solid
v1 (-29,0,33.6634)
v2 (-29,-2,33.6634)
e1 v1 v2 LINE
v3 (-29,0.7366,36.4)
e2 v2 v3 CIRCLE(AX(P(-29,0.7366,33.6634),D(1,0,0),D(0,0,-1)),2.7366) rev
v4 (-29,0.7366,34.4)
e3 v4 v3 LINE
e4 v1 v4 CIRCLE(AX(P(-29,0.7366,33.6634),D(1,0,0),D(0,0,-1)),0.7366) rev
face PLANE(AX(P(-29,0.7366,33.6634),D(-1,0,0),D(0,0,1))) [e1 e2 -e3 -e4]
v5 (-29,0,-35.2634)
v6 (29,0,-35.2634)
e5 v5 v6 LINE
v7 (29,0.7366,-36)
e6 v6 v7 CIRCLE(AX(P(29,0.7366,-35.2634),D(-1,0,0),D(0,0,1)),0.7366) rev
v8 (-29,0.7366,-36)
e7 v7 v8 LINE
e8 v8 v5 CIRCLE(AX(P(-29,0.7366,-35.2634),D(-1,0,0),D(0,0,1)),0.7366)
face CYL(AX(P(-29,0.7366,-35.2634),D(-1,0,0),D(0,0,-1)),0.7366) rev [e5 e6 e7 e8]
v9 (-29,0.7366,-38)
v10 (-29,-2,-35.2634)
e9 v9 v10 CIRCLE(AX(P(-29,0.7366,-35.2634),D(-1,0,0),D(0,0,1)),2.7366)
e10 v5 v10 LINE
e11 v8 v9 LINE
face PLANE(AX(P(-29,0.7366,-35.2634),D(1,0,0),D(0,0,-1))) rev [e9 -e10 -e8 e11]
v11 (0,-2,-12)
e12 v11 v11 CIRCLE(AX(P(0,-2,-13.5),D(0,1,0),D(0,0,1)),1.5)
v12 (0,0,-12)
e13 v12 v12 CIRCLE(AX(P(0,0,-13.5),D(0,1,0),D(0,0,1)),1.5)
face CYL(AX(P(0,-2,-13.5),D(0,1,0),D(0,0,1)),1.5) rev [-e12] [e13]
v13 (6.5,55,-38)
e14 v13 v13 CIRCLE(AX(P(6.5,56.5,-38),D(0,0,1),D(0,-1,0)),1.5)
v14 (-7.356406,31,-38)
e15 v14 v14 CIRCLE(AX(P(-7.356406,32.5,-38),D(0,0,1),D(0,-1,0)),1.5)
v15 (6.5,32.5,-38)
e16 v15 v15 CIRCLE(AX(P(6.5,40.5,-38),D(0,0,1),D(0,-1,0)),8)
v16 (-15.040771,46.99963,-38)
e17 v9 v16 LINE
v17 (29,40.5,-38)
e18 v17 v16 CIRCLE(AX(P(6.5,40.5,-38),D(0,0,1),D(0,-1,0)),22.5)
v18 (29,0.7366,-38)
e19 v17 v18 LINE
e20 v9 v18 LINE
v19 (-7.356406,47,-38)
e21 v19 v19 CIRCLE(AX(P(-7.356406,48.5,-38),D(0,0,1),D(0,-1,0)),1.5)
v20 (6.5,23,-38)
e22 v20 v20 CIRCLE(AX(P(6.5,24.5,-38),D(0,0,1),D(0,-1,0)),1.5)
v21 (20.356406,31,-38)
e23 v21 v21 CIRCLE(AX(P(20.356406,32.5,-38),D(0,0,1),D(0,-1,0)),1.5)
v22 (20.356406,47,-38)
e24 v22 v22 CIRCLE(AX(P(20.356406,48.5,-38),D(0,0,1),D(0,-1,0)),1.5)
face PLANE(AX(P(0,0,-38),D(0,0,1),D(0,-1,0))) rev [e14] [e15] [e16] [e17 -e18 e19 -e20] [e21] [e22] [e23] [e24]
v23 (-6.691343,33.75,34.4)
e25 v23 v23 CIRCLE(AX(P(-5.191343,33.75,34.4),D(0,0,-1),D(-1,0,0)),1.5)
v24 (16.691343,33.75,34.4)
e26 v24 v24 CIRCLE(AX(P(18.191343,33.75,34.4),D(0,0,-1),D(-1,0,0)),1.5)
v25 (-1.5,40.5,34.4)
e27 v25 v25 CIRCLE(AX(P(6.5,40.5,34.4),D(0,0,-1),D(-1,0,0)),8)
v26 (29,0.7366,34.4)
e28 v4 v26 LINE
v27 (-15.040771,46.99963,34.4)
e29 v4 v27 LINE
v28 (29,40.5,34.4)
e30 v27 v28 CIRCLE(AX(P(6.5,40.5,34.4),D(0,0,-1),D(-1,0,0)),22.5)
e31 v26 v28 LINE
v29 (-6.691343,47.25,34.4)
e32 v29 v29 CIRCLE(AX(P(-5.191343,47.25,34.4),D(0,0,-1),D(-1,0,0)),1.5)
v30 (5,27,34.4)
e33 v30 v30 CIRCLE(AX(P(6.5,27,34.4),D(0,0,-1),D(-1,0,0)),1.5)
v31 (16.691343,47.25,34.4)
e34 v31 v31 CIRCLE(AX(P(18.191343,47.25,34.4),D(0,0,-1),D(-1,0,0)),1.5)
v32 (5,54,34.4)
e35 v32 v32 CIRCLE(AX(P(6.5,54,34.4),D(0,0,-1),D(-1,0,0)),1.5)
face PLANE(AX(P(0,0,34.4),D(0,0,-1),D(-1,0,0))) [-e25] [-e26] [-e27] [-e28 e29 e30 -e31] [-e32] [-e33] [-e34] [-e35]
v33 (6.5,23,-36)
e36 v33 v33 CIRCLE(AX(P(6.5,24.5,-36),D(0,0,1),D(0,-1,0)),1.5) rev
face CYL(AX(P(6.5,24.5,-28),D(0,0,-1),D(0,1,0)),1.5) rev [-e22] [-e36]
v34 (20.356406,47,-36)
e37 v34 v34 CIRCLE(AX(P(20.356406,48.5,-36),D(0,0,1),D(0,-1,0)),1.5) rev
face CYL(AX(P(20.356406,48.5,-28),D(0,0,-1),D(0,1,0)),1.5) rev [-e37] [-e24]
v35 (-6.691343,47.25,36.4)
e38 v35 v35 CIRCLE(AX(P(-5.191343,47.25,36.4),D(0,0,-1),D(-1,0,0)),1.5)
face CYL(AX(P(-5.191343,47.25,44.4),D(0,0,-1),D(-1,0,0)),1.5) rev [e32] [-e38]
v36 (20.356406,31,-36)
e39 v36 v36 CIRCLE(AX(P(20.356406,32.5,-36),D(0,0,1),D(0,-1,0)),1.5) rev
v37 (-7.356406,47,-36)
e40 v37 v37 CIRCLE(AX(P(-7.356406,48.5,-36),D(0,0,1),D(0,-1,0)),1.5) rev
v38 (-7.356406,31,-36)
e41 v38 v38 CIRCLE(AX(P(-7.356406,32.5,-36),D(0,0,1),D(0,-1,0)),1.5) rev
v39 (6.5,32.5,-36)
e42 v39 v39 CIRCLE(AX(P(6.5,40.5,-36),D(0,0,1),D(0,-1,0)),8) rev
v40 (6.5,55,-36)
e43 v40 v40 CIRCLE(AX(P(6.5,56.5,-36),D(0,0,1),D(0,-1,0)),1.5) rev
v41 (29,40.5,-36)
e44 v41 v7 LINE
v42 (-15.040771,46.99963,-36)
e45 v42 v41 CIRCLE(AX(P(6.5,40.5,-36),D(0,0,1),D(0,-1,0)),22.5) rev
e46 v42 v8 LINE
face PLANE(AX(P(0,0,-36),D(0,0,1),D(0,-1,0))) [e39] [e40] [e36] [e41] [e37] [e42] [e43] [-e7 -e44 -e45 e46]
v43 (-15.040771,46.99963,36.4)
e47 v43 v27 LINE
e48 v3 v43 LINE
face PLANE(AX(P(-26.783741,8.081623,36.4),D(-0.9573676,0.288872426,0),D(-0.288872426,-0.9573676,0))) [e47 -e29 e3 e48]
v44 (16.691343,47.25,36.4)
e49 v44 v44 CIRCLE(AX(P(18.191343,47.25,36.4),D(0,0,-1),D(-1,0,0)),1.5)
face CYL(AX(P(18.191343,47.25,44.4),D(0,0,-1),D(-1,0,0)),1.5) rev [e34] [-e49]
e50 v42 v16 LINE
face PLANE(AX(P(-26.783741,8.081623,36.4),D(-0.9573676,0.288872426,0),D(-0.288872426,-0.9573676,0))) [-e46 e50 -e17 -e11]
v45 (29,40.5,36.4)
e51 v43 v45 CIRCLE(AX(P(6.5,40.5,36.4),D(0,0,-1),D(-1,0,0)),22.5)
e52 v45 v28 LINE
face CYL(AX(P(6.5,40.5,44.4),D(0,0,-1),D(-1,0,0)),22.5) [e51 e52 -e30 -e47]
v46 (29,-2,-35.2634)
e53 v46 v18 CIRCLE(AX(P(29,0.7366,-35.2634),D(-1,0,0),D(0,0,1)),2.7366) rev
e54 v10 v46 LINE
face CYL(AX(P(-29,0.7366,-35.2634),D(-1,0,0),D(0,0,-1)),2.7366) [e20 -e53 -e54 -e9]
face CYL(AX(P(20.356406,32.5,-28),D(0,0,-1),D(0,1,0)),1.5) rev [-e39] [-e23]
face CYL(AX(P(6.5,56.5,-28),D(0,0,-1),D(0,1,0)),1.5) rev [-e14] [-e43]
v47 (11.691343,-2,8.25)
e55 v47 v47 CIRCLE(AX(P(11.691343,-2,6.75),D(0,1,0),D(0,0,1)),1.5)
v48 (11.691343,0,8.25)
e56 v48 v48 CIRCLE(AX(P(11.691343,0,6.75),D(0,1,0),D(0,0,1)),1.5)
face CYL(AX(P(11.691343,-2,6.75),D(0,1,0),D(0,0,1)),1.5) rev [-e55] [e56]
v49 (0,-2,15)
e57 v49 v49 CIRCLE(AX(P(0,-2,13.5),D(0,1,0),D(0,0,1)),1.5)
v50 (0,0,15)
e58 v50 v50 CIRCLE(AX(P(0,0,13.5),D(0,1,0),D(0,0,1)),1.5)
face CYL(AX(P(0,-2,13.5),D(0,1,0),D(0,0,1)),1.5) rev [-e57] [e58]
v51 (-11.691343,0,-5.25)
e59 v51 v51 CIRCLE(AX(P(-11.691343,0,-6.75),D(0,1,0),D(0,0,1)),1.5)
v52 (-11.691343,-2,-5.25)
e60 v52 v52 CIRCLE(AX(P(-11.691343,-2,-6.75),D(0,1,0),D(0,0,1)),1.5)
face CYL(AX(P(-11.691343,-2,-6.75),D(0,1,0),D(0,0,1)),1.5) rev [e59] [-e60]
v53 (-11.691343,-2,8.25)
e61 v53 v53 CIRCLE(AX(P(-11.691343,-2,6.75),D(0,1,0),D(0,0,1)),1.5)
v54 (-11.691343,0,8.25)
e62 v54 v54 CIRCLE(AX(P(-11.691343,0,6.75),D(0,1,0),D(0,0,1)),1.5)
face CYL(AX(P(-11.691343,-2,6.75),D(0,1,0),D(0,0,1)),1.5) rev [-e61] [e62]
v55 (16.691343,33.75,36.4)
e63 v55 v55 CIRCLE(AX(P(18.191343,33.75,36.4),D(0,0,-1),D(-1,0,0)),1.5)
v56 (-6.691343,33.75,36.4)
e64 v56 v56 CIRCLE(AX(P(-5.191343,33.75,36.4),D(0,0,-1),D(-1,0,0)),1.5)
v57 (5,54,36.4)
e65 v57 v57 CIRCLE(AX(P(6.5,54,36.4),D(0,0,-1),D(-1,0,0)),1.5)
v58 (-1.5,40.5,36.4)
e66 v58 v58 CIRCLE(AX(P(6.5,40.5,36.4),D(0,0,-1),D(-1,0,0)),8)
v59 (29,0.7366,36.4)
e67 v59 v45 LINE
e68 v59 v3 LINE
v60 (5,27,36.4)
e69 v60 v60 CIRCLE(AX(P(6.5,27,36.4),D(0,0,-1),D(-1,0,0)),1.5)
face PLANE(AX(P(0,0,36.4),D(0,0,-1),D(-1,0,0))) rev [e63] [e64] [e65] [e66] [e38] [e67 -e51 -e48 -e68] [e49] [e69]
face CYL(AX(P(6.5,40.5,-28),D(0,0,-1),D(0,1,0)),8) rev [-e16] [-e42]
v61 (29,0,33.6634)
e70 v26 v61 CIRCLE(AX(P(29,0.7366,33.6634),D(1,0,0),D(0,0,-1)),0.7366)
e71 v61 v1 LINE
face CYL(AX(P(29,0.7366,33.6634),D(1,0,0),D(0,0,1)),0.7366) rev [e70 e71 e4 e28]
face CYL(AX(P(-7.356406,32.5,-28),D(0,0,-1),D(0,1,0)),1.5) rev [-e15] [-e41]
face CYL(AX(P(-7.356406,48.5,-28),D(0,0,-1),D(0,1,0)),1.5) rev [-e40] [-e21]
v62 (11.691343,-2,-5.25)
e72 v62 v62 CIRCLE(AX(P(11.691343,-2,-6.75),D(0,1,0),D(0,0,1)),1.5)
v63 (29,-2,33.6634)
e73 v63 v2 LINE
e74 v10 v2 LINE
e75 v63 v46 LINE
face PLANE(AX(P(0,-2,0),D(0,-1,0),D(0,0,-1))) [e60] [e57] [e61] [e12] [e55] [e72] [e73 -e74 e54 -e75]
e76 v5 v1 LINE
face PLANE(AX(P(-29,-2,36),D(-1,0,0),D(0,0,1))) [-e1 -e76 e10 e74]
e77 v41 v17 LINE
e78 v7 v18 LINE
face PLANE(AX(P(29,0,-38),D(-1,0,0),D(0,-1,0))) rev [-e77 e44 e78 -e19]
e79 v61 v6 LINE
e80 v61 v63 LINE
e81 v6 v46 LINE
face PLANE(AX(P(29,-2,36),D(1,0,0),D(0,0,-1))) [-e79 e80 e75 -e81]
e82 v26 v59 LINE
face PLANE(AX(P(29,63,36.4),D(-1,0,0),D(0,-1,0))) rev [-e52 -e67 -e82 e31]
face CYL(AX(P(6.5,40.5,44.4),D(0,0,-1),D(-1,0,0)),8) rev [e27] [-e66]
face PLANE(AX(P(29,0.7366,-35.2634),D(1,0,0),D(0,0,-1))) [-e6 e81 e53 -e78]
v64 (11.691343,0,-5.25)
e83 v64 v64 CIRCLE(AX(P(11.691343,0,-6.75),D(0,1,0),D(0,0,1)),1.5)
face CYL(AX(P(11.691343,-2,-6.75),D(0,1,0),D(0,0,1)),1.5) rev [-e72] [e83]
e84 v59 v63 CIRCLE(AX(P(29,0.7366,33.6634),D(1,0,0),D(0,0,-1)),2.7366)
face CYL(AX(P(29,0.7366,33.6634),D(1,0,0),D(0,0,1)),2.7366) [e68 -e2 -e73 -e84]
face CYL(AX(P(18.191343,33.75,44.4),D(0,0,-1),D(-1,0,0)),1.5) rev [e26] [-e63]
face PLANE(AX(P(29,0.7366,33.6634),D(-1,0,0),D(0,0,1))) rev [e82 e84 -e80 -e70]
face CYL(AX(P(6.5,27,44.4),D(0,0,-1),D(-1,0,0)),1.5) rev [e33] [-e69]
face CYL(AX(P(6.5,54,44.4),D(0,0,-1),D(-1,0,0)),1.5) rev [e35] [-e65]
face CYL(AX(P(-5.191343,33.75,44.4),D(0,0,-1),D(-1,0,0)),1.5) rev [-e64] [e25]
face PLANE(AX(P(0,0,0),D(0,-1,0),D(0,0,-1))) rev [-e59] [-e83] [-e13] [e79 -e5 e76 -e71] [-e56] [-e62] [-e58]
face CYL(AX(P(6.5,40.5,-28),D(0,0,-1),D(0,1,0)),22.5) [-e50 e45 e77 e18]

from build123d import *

# Parameters (mm, degrees)
SKETCH_1_R                         = 1.5
SM_BASE_FLANGE_1_DEPTH             = 2
SM_EDGE_FLANGE_1_STRIP_W           = 9.4732
SM_EDGE_FLANGE_1_STRIP_H           = 2
SM_EDGE_FLANGE_1_STRIP_CUT_DEPTH   = 58
SM_EDGE_FLANGE_1_STRIP_2_W         = 9.4732
SM_EDGE_FLANGE_1_STRIP_2_H         = 2
SM_EDGE_FLANGE_1_STRIP_CUT_2_DEPTH = 58
SM_EDGE_FLANGE_1_DEPTH             = 58
SM_EDGE_FLANGE_1_BEND_DEPTH        = 58
SKETCH_12_R                        = 1.5
SKETCH_12_R_2                      = 8
CUT_EXTRUDE_1_DEPTH                = 10
SKETCH_21_R                        = 1.5
SKETCH_21_R_2                      = 8
CUT_EXTRUDE_2_DEPTH                = 10
CUT_EXTRUDE_3_DEPTH                = 102.712142835


# Sheet-metal steps are written as plain solids
with BuildPart() as part:
    # Sketch 1 → 基体-法兰1 (new body)
    with BuildSketch(Plane(origin=(0, 0, 0), x_dir=(1, 0, 0), z_dir=(0, 1, 0))):
        Polygon((-29, -36), (-29, 36), (-29, 38), (29, 38), (29, 36), (29, -36), (29, -36.4), (-29, -36.4), align=None)
        with Locations(Location((0, 13.5, 0), (0, 0, 270))):
            Circle(SKETCH_1_R, mode=Mode.SUBTRACT)
        with Locations(Location((11.691342951, 6.75, 0), (0, 0, 270))):
            Circle(SKETCH_1_R, mode=Mode.SUBTRACT)
        with Locations(Location((11.691342951, -6.75, 0), (0, 0, 270))):
            Circle(SKETCH_1_R, mode=Mode.SUBTRACT)
        with Locations(Location((0, -13.5, 0), (0, 0, 270))):
            Circle(SKETCH_1_R, mode=Mode.SUBTRACT)
        with Locations(Location((-11.691342951, -6.75, 0), (0, 0, 270))):
            Circle(SKETCH_1_R, mode=Mode.SUBTRACT)
        with Locations(Location((-11.691342951, 6.75, 0), (0, 0, 270))):
            Circle(SKETCH_1_R, mode=Mode.SUBTRACT)
    extrude(amount=-SM_BASE_FLANGE_1_DEPTH)

    # 边线-法兰1 strip (across the edge) → 边线-法兰1 strip cut (cut)
    with BuildSketch(Plane(origin=(29, 0, -38), x_dir=(0, 0, 1), z_dir=(-1, 0, 0))):
        with Locations((-2, -1)):
            Rectangle(SM_EDGE_FLANGE_1_STRIP_W, SM_EDGE_FLANGE_1_STRIP_H)
    extrude(amount=SM_EDGE_FLANGE_1_STRIP_CUT_DEPTH, mode=Mode.SUBTRACT)

    # 边线-法兰1 strip 2 (across the edge) → 边线-法兰1 strip cut 2 (cut)
    with BuildSketch(Plane(origin=(-29, 0, 36.4), x_dir=(0, 0, -1), z_dir=(1, 0, 0))):
        with Locations((-2, -1)):
            Rectangle(SM_EDGE_FLANGE_1_STRIP_2_W, SM_EDGE_FLANGE_1_STRIP_2_H)
    extrude(amount=SM_EDGE_FLANGE_1_STRIP_CUT_2_DEPTH, mode=Mode.SUBTRACT)

    # 边线-法兰1 section (across the edge) → 边线-法兰1 (add)
    with BuildSketch(Plane(origin=(29, 0, -38), x_dir=(0, 0, 1), z_dir=(-1, 0, 0))):
        with BuildLine():
            Line((0, 0.7366), (0, 63))
            Line((0, 63), (2, 63))
            Line((2, 63), (2, 0.7366))
            ThreePointArc((2, 0.7366), (2.215745145, 0.215745145), (2.7366, 0))
            Line((2.7366, 0), (2.7366, -2))
            ThreePointArc((2.7366, -2), (0.801531583, -1.198468417), (0, 0.7366))
        make_face()
    extrude(amount=SM_EDGE_FLANGE_1_DEPTH)

    # 边线-法兰1 section 2 (across the edge) → 边线-法兰1 bend (add)
    with BuildSketch(Plane(origin=(-29, 0, 36.4), x_dir=(0, 0, -1), z_dir=(1, 0, 0))):
        with BuildLine():
            Line((0, 0.7366), (0, 63))
            Line((0, 63), (2, 63))
            Line((2, 63), (2, 0.7366))
            ThreePointArc((2, 0.7366), (2.215745145, 0.215745145), (2.7366, 0))
            Line((2.7366, 0), (2.7366, -2))
            ThreePointArc((2.7366, -2), (0.801531583, -1.198468417), (0, 0.7366))
        make_face()
    extrude(amount=SM_EDGE_FLANGE_1_BEND_DEPTH)

    # 草图12 → 切除-拉伸1 (cut)
    with BuildSketch(Plane(origin=(0, 0, -38), x_dir=(-1, 0, 0), z_dir=(0, 0, -1))):
        with BuildLine():
            ThreePointArc((-29, 40.5), (-22.409902591, 56.409902563), (-6.50000004, 63))
            Line((-6.50000004, 63), (-29, 63))
            Line((-29, 63), (-29, 40.5))
        make_face()
        with Locations(Location((-6.5, 56.5, 0), (0, 0, 270))):
            Circle(SKETCH_12_R)
        with Locations(Location((7.356406461, 48.5, 0), (0, 0, 270))):
            Circle(SKETCH_12_R)
        with Locations(Location((-20.356406461, 48.5, 0), (0, 0, 270))):
            Circle(SKETCH_12_R)
        with Locations(Location((-20.356406461, 32.5, 0), (0, 0, 270))):
            Circle(SKETCH_12_R)
        with Locations(Location((-6.5, 24.5, 0), (0, 0, 270))):
            Circle(SKETCH_12_R)
        with Locations(Location((7.356406461, 32.5, 0), (0, 0, 270))):
            Circle(SKETCH_12_R)
        with Locations(Location((-6.5, 40.5, 0), (0, 0, 270))):
            Circle(SKETCH_12_R_2)
    extrude(amount=-CUT_EXTRUDE_1_DEPTH, mode=Mode.SUBTRACT)

    # 草图21 → 切除-拉伸2 (cut)
    with BuildSketch(Plane(origin=(0, 0, 34.4), x_dir=(-1, 0, 0), z_dir=(0, 0, -1))):
        with Locations((5.191342951, 47.25)):
            Circle(SKETCH_21_R)
        with Locations(Location((-6.5, 40.5, 0), (0, 0, 270))):
            Circle(SKETCH_21_R_2)
        with Locations((-6.5, 54)):
            Circle(SKETCH_21_R)
        with BuildLine():
            ThreePointArc((-29, 40.5), (-22.409902577, 56.409902577), (-6.5, 63))
            Line((-6.5, 63), (-29, 63))
            Line((-29, 63), (-29, 40.5))
        make_face()
        with Locations((-18.191342951, 47.25)):
            Circle(SKETCH_21_R)
        with Locations((-18.191342951, 33.75)):
            Circle(SKETCH_21_R)
        with Locations((-6.5, 27)):
            Circle(SKETCH_21_R)
        with Locations((5.191342951, 33.75)):
            Circle(SKETCH_21_R)
    extrude(amount=-CUT_EXTRUDE_2_DEPTH, mode=Mode.SUBTRACT)

    # 草图22 → 切除-拉伸3 (cut, through all)
    with BuildSketch(Plane(origin=(0, 0, -38), x_dir=(-1, 0, 0), z_dir=(0, 0, -1))):
        with BuildLine():
            Line((15.040771003, 46.999629574), (29, 0.7366))
            Line((29, 0.7366), (29, 63))
            Line((29, 63), (-6.5, 63))
            ThreePointArc((-6.5, 63), (6.91656317, 58.56227651), (15.040771003, 46.999629574))
        make_face()
    extrude(amount=-CUT_EXTRUDE_3_DEPTH, mode=Mode.SUBTRACT)


solid = part.part
